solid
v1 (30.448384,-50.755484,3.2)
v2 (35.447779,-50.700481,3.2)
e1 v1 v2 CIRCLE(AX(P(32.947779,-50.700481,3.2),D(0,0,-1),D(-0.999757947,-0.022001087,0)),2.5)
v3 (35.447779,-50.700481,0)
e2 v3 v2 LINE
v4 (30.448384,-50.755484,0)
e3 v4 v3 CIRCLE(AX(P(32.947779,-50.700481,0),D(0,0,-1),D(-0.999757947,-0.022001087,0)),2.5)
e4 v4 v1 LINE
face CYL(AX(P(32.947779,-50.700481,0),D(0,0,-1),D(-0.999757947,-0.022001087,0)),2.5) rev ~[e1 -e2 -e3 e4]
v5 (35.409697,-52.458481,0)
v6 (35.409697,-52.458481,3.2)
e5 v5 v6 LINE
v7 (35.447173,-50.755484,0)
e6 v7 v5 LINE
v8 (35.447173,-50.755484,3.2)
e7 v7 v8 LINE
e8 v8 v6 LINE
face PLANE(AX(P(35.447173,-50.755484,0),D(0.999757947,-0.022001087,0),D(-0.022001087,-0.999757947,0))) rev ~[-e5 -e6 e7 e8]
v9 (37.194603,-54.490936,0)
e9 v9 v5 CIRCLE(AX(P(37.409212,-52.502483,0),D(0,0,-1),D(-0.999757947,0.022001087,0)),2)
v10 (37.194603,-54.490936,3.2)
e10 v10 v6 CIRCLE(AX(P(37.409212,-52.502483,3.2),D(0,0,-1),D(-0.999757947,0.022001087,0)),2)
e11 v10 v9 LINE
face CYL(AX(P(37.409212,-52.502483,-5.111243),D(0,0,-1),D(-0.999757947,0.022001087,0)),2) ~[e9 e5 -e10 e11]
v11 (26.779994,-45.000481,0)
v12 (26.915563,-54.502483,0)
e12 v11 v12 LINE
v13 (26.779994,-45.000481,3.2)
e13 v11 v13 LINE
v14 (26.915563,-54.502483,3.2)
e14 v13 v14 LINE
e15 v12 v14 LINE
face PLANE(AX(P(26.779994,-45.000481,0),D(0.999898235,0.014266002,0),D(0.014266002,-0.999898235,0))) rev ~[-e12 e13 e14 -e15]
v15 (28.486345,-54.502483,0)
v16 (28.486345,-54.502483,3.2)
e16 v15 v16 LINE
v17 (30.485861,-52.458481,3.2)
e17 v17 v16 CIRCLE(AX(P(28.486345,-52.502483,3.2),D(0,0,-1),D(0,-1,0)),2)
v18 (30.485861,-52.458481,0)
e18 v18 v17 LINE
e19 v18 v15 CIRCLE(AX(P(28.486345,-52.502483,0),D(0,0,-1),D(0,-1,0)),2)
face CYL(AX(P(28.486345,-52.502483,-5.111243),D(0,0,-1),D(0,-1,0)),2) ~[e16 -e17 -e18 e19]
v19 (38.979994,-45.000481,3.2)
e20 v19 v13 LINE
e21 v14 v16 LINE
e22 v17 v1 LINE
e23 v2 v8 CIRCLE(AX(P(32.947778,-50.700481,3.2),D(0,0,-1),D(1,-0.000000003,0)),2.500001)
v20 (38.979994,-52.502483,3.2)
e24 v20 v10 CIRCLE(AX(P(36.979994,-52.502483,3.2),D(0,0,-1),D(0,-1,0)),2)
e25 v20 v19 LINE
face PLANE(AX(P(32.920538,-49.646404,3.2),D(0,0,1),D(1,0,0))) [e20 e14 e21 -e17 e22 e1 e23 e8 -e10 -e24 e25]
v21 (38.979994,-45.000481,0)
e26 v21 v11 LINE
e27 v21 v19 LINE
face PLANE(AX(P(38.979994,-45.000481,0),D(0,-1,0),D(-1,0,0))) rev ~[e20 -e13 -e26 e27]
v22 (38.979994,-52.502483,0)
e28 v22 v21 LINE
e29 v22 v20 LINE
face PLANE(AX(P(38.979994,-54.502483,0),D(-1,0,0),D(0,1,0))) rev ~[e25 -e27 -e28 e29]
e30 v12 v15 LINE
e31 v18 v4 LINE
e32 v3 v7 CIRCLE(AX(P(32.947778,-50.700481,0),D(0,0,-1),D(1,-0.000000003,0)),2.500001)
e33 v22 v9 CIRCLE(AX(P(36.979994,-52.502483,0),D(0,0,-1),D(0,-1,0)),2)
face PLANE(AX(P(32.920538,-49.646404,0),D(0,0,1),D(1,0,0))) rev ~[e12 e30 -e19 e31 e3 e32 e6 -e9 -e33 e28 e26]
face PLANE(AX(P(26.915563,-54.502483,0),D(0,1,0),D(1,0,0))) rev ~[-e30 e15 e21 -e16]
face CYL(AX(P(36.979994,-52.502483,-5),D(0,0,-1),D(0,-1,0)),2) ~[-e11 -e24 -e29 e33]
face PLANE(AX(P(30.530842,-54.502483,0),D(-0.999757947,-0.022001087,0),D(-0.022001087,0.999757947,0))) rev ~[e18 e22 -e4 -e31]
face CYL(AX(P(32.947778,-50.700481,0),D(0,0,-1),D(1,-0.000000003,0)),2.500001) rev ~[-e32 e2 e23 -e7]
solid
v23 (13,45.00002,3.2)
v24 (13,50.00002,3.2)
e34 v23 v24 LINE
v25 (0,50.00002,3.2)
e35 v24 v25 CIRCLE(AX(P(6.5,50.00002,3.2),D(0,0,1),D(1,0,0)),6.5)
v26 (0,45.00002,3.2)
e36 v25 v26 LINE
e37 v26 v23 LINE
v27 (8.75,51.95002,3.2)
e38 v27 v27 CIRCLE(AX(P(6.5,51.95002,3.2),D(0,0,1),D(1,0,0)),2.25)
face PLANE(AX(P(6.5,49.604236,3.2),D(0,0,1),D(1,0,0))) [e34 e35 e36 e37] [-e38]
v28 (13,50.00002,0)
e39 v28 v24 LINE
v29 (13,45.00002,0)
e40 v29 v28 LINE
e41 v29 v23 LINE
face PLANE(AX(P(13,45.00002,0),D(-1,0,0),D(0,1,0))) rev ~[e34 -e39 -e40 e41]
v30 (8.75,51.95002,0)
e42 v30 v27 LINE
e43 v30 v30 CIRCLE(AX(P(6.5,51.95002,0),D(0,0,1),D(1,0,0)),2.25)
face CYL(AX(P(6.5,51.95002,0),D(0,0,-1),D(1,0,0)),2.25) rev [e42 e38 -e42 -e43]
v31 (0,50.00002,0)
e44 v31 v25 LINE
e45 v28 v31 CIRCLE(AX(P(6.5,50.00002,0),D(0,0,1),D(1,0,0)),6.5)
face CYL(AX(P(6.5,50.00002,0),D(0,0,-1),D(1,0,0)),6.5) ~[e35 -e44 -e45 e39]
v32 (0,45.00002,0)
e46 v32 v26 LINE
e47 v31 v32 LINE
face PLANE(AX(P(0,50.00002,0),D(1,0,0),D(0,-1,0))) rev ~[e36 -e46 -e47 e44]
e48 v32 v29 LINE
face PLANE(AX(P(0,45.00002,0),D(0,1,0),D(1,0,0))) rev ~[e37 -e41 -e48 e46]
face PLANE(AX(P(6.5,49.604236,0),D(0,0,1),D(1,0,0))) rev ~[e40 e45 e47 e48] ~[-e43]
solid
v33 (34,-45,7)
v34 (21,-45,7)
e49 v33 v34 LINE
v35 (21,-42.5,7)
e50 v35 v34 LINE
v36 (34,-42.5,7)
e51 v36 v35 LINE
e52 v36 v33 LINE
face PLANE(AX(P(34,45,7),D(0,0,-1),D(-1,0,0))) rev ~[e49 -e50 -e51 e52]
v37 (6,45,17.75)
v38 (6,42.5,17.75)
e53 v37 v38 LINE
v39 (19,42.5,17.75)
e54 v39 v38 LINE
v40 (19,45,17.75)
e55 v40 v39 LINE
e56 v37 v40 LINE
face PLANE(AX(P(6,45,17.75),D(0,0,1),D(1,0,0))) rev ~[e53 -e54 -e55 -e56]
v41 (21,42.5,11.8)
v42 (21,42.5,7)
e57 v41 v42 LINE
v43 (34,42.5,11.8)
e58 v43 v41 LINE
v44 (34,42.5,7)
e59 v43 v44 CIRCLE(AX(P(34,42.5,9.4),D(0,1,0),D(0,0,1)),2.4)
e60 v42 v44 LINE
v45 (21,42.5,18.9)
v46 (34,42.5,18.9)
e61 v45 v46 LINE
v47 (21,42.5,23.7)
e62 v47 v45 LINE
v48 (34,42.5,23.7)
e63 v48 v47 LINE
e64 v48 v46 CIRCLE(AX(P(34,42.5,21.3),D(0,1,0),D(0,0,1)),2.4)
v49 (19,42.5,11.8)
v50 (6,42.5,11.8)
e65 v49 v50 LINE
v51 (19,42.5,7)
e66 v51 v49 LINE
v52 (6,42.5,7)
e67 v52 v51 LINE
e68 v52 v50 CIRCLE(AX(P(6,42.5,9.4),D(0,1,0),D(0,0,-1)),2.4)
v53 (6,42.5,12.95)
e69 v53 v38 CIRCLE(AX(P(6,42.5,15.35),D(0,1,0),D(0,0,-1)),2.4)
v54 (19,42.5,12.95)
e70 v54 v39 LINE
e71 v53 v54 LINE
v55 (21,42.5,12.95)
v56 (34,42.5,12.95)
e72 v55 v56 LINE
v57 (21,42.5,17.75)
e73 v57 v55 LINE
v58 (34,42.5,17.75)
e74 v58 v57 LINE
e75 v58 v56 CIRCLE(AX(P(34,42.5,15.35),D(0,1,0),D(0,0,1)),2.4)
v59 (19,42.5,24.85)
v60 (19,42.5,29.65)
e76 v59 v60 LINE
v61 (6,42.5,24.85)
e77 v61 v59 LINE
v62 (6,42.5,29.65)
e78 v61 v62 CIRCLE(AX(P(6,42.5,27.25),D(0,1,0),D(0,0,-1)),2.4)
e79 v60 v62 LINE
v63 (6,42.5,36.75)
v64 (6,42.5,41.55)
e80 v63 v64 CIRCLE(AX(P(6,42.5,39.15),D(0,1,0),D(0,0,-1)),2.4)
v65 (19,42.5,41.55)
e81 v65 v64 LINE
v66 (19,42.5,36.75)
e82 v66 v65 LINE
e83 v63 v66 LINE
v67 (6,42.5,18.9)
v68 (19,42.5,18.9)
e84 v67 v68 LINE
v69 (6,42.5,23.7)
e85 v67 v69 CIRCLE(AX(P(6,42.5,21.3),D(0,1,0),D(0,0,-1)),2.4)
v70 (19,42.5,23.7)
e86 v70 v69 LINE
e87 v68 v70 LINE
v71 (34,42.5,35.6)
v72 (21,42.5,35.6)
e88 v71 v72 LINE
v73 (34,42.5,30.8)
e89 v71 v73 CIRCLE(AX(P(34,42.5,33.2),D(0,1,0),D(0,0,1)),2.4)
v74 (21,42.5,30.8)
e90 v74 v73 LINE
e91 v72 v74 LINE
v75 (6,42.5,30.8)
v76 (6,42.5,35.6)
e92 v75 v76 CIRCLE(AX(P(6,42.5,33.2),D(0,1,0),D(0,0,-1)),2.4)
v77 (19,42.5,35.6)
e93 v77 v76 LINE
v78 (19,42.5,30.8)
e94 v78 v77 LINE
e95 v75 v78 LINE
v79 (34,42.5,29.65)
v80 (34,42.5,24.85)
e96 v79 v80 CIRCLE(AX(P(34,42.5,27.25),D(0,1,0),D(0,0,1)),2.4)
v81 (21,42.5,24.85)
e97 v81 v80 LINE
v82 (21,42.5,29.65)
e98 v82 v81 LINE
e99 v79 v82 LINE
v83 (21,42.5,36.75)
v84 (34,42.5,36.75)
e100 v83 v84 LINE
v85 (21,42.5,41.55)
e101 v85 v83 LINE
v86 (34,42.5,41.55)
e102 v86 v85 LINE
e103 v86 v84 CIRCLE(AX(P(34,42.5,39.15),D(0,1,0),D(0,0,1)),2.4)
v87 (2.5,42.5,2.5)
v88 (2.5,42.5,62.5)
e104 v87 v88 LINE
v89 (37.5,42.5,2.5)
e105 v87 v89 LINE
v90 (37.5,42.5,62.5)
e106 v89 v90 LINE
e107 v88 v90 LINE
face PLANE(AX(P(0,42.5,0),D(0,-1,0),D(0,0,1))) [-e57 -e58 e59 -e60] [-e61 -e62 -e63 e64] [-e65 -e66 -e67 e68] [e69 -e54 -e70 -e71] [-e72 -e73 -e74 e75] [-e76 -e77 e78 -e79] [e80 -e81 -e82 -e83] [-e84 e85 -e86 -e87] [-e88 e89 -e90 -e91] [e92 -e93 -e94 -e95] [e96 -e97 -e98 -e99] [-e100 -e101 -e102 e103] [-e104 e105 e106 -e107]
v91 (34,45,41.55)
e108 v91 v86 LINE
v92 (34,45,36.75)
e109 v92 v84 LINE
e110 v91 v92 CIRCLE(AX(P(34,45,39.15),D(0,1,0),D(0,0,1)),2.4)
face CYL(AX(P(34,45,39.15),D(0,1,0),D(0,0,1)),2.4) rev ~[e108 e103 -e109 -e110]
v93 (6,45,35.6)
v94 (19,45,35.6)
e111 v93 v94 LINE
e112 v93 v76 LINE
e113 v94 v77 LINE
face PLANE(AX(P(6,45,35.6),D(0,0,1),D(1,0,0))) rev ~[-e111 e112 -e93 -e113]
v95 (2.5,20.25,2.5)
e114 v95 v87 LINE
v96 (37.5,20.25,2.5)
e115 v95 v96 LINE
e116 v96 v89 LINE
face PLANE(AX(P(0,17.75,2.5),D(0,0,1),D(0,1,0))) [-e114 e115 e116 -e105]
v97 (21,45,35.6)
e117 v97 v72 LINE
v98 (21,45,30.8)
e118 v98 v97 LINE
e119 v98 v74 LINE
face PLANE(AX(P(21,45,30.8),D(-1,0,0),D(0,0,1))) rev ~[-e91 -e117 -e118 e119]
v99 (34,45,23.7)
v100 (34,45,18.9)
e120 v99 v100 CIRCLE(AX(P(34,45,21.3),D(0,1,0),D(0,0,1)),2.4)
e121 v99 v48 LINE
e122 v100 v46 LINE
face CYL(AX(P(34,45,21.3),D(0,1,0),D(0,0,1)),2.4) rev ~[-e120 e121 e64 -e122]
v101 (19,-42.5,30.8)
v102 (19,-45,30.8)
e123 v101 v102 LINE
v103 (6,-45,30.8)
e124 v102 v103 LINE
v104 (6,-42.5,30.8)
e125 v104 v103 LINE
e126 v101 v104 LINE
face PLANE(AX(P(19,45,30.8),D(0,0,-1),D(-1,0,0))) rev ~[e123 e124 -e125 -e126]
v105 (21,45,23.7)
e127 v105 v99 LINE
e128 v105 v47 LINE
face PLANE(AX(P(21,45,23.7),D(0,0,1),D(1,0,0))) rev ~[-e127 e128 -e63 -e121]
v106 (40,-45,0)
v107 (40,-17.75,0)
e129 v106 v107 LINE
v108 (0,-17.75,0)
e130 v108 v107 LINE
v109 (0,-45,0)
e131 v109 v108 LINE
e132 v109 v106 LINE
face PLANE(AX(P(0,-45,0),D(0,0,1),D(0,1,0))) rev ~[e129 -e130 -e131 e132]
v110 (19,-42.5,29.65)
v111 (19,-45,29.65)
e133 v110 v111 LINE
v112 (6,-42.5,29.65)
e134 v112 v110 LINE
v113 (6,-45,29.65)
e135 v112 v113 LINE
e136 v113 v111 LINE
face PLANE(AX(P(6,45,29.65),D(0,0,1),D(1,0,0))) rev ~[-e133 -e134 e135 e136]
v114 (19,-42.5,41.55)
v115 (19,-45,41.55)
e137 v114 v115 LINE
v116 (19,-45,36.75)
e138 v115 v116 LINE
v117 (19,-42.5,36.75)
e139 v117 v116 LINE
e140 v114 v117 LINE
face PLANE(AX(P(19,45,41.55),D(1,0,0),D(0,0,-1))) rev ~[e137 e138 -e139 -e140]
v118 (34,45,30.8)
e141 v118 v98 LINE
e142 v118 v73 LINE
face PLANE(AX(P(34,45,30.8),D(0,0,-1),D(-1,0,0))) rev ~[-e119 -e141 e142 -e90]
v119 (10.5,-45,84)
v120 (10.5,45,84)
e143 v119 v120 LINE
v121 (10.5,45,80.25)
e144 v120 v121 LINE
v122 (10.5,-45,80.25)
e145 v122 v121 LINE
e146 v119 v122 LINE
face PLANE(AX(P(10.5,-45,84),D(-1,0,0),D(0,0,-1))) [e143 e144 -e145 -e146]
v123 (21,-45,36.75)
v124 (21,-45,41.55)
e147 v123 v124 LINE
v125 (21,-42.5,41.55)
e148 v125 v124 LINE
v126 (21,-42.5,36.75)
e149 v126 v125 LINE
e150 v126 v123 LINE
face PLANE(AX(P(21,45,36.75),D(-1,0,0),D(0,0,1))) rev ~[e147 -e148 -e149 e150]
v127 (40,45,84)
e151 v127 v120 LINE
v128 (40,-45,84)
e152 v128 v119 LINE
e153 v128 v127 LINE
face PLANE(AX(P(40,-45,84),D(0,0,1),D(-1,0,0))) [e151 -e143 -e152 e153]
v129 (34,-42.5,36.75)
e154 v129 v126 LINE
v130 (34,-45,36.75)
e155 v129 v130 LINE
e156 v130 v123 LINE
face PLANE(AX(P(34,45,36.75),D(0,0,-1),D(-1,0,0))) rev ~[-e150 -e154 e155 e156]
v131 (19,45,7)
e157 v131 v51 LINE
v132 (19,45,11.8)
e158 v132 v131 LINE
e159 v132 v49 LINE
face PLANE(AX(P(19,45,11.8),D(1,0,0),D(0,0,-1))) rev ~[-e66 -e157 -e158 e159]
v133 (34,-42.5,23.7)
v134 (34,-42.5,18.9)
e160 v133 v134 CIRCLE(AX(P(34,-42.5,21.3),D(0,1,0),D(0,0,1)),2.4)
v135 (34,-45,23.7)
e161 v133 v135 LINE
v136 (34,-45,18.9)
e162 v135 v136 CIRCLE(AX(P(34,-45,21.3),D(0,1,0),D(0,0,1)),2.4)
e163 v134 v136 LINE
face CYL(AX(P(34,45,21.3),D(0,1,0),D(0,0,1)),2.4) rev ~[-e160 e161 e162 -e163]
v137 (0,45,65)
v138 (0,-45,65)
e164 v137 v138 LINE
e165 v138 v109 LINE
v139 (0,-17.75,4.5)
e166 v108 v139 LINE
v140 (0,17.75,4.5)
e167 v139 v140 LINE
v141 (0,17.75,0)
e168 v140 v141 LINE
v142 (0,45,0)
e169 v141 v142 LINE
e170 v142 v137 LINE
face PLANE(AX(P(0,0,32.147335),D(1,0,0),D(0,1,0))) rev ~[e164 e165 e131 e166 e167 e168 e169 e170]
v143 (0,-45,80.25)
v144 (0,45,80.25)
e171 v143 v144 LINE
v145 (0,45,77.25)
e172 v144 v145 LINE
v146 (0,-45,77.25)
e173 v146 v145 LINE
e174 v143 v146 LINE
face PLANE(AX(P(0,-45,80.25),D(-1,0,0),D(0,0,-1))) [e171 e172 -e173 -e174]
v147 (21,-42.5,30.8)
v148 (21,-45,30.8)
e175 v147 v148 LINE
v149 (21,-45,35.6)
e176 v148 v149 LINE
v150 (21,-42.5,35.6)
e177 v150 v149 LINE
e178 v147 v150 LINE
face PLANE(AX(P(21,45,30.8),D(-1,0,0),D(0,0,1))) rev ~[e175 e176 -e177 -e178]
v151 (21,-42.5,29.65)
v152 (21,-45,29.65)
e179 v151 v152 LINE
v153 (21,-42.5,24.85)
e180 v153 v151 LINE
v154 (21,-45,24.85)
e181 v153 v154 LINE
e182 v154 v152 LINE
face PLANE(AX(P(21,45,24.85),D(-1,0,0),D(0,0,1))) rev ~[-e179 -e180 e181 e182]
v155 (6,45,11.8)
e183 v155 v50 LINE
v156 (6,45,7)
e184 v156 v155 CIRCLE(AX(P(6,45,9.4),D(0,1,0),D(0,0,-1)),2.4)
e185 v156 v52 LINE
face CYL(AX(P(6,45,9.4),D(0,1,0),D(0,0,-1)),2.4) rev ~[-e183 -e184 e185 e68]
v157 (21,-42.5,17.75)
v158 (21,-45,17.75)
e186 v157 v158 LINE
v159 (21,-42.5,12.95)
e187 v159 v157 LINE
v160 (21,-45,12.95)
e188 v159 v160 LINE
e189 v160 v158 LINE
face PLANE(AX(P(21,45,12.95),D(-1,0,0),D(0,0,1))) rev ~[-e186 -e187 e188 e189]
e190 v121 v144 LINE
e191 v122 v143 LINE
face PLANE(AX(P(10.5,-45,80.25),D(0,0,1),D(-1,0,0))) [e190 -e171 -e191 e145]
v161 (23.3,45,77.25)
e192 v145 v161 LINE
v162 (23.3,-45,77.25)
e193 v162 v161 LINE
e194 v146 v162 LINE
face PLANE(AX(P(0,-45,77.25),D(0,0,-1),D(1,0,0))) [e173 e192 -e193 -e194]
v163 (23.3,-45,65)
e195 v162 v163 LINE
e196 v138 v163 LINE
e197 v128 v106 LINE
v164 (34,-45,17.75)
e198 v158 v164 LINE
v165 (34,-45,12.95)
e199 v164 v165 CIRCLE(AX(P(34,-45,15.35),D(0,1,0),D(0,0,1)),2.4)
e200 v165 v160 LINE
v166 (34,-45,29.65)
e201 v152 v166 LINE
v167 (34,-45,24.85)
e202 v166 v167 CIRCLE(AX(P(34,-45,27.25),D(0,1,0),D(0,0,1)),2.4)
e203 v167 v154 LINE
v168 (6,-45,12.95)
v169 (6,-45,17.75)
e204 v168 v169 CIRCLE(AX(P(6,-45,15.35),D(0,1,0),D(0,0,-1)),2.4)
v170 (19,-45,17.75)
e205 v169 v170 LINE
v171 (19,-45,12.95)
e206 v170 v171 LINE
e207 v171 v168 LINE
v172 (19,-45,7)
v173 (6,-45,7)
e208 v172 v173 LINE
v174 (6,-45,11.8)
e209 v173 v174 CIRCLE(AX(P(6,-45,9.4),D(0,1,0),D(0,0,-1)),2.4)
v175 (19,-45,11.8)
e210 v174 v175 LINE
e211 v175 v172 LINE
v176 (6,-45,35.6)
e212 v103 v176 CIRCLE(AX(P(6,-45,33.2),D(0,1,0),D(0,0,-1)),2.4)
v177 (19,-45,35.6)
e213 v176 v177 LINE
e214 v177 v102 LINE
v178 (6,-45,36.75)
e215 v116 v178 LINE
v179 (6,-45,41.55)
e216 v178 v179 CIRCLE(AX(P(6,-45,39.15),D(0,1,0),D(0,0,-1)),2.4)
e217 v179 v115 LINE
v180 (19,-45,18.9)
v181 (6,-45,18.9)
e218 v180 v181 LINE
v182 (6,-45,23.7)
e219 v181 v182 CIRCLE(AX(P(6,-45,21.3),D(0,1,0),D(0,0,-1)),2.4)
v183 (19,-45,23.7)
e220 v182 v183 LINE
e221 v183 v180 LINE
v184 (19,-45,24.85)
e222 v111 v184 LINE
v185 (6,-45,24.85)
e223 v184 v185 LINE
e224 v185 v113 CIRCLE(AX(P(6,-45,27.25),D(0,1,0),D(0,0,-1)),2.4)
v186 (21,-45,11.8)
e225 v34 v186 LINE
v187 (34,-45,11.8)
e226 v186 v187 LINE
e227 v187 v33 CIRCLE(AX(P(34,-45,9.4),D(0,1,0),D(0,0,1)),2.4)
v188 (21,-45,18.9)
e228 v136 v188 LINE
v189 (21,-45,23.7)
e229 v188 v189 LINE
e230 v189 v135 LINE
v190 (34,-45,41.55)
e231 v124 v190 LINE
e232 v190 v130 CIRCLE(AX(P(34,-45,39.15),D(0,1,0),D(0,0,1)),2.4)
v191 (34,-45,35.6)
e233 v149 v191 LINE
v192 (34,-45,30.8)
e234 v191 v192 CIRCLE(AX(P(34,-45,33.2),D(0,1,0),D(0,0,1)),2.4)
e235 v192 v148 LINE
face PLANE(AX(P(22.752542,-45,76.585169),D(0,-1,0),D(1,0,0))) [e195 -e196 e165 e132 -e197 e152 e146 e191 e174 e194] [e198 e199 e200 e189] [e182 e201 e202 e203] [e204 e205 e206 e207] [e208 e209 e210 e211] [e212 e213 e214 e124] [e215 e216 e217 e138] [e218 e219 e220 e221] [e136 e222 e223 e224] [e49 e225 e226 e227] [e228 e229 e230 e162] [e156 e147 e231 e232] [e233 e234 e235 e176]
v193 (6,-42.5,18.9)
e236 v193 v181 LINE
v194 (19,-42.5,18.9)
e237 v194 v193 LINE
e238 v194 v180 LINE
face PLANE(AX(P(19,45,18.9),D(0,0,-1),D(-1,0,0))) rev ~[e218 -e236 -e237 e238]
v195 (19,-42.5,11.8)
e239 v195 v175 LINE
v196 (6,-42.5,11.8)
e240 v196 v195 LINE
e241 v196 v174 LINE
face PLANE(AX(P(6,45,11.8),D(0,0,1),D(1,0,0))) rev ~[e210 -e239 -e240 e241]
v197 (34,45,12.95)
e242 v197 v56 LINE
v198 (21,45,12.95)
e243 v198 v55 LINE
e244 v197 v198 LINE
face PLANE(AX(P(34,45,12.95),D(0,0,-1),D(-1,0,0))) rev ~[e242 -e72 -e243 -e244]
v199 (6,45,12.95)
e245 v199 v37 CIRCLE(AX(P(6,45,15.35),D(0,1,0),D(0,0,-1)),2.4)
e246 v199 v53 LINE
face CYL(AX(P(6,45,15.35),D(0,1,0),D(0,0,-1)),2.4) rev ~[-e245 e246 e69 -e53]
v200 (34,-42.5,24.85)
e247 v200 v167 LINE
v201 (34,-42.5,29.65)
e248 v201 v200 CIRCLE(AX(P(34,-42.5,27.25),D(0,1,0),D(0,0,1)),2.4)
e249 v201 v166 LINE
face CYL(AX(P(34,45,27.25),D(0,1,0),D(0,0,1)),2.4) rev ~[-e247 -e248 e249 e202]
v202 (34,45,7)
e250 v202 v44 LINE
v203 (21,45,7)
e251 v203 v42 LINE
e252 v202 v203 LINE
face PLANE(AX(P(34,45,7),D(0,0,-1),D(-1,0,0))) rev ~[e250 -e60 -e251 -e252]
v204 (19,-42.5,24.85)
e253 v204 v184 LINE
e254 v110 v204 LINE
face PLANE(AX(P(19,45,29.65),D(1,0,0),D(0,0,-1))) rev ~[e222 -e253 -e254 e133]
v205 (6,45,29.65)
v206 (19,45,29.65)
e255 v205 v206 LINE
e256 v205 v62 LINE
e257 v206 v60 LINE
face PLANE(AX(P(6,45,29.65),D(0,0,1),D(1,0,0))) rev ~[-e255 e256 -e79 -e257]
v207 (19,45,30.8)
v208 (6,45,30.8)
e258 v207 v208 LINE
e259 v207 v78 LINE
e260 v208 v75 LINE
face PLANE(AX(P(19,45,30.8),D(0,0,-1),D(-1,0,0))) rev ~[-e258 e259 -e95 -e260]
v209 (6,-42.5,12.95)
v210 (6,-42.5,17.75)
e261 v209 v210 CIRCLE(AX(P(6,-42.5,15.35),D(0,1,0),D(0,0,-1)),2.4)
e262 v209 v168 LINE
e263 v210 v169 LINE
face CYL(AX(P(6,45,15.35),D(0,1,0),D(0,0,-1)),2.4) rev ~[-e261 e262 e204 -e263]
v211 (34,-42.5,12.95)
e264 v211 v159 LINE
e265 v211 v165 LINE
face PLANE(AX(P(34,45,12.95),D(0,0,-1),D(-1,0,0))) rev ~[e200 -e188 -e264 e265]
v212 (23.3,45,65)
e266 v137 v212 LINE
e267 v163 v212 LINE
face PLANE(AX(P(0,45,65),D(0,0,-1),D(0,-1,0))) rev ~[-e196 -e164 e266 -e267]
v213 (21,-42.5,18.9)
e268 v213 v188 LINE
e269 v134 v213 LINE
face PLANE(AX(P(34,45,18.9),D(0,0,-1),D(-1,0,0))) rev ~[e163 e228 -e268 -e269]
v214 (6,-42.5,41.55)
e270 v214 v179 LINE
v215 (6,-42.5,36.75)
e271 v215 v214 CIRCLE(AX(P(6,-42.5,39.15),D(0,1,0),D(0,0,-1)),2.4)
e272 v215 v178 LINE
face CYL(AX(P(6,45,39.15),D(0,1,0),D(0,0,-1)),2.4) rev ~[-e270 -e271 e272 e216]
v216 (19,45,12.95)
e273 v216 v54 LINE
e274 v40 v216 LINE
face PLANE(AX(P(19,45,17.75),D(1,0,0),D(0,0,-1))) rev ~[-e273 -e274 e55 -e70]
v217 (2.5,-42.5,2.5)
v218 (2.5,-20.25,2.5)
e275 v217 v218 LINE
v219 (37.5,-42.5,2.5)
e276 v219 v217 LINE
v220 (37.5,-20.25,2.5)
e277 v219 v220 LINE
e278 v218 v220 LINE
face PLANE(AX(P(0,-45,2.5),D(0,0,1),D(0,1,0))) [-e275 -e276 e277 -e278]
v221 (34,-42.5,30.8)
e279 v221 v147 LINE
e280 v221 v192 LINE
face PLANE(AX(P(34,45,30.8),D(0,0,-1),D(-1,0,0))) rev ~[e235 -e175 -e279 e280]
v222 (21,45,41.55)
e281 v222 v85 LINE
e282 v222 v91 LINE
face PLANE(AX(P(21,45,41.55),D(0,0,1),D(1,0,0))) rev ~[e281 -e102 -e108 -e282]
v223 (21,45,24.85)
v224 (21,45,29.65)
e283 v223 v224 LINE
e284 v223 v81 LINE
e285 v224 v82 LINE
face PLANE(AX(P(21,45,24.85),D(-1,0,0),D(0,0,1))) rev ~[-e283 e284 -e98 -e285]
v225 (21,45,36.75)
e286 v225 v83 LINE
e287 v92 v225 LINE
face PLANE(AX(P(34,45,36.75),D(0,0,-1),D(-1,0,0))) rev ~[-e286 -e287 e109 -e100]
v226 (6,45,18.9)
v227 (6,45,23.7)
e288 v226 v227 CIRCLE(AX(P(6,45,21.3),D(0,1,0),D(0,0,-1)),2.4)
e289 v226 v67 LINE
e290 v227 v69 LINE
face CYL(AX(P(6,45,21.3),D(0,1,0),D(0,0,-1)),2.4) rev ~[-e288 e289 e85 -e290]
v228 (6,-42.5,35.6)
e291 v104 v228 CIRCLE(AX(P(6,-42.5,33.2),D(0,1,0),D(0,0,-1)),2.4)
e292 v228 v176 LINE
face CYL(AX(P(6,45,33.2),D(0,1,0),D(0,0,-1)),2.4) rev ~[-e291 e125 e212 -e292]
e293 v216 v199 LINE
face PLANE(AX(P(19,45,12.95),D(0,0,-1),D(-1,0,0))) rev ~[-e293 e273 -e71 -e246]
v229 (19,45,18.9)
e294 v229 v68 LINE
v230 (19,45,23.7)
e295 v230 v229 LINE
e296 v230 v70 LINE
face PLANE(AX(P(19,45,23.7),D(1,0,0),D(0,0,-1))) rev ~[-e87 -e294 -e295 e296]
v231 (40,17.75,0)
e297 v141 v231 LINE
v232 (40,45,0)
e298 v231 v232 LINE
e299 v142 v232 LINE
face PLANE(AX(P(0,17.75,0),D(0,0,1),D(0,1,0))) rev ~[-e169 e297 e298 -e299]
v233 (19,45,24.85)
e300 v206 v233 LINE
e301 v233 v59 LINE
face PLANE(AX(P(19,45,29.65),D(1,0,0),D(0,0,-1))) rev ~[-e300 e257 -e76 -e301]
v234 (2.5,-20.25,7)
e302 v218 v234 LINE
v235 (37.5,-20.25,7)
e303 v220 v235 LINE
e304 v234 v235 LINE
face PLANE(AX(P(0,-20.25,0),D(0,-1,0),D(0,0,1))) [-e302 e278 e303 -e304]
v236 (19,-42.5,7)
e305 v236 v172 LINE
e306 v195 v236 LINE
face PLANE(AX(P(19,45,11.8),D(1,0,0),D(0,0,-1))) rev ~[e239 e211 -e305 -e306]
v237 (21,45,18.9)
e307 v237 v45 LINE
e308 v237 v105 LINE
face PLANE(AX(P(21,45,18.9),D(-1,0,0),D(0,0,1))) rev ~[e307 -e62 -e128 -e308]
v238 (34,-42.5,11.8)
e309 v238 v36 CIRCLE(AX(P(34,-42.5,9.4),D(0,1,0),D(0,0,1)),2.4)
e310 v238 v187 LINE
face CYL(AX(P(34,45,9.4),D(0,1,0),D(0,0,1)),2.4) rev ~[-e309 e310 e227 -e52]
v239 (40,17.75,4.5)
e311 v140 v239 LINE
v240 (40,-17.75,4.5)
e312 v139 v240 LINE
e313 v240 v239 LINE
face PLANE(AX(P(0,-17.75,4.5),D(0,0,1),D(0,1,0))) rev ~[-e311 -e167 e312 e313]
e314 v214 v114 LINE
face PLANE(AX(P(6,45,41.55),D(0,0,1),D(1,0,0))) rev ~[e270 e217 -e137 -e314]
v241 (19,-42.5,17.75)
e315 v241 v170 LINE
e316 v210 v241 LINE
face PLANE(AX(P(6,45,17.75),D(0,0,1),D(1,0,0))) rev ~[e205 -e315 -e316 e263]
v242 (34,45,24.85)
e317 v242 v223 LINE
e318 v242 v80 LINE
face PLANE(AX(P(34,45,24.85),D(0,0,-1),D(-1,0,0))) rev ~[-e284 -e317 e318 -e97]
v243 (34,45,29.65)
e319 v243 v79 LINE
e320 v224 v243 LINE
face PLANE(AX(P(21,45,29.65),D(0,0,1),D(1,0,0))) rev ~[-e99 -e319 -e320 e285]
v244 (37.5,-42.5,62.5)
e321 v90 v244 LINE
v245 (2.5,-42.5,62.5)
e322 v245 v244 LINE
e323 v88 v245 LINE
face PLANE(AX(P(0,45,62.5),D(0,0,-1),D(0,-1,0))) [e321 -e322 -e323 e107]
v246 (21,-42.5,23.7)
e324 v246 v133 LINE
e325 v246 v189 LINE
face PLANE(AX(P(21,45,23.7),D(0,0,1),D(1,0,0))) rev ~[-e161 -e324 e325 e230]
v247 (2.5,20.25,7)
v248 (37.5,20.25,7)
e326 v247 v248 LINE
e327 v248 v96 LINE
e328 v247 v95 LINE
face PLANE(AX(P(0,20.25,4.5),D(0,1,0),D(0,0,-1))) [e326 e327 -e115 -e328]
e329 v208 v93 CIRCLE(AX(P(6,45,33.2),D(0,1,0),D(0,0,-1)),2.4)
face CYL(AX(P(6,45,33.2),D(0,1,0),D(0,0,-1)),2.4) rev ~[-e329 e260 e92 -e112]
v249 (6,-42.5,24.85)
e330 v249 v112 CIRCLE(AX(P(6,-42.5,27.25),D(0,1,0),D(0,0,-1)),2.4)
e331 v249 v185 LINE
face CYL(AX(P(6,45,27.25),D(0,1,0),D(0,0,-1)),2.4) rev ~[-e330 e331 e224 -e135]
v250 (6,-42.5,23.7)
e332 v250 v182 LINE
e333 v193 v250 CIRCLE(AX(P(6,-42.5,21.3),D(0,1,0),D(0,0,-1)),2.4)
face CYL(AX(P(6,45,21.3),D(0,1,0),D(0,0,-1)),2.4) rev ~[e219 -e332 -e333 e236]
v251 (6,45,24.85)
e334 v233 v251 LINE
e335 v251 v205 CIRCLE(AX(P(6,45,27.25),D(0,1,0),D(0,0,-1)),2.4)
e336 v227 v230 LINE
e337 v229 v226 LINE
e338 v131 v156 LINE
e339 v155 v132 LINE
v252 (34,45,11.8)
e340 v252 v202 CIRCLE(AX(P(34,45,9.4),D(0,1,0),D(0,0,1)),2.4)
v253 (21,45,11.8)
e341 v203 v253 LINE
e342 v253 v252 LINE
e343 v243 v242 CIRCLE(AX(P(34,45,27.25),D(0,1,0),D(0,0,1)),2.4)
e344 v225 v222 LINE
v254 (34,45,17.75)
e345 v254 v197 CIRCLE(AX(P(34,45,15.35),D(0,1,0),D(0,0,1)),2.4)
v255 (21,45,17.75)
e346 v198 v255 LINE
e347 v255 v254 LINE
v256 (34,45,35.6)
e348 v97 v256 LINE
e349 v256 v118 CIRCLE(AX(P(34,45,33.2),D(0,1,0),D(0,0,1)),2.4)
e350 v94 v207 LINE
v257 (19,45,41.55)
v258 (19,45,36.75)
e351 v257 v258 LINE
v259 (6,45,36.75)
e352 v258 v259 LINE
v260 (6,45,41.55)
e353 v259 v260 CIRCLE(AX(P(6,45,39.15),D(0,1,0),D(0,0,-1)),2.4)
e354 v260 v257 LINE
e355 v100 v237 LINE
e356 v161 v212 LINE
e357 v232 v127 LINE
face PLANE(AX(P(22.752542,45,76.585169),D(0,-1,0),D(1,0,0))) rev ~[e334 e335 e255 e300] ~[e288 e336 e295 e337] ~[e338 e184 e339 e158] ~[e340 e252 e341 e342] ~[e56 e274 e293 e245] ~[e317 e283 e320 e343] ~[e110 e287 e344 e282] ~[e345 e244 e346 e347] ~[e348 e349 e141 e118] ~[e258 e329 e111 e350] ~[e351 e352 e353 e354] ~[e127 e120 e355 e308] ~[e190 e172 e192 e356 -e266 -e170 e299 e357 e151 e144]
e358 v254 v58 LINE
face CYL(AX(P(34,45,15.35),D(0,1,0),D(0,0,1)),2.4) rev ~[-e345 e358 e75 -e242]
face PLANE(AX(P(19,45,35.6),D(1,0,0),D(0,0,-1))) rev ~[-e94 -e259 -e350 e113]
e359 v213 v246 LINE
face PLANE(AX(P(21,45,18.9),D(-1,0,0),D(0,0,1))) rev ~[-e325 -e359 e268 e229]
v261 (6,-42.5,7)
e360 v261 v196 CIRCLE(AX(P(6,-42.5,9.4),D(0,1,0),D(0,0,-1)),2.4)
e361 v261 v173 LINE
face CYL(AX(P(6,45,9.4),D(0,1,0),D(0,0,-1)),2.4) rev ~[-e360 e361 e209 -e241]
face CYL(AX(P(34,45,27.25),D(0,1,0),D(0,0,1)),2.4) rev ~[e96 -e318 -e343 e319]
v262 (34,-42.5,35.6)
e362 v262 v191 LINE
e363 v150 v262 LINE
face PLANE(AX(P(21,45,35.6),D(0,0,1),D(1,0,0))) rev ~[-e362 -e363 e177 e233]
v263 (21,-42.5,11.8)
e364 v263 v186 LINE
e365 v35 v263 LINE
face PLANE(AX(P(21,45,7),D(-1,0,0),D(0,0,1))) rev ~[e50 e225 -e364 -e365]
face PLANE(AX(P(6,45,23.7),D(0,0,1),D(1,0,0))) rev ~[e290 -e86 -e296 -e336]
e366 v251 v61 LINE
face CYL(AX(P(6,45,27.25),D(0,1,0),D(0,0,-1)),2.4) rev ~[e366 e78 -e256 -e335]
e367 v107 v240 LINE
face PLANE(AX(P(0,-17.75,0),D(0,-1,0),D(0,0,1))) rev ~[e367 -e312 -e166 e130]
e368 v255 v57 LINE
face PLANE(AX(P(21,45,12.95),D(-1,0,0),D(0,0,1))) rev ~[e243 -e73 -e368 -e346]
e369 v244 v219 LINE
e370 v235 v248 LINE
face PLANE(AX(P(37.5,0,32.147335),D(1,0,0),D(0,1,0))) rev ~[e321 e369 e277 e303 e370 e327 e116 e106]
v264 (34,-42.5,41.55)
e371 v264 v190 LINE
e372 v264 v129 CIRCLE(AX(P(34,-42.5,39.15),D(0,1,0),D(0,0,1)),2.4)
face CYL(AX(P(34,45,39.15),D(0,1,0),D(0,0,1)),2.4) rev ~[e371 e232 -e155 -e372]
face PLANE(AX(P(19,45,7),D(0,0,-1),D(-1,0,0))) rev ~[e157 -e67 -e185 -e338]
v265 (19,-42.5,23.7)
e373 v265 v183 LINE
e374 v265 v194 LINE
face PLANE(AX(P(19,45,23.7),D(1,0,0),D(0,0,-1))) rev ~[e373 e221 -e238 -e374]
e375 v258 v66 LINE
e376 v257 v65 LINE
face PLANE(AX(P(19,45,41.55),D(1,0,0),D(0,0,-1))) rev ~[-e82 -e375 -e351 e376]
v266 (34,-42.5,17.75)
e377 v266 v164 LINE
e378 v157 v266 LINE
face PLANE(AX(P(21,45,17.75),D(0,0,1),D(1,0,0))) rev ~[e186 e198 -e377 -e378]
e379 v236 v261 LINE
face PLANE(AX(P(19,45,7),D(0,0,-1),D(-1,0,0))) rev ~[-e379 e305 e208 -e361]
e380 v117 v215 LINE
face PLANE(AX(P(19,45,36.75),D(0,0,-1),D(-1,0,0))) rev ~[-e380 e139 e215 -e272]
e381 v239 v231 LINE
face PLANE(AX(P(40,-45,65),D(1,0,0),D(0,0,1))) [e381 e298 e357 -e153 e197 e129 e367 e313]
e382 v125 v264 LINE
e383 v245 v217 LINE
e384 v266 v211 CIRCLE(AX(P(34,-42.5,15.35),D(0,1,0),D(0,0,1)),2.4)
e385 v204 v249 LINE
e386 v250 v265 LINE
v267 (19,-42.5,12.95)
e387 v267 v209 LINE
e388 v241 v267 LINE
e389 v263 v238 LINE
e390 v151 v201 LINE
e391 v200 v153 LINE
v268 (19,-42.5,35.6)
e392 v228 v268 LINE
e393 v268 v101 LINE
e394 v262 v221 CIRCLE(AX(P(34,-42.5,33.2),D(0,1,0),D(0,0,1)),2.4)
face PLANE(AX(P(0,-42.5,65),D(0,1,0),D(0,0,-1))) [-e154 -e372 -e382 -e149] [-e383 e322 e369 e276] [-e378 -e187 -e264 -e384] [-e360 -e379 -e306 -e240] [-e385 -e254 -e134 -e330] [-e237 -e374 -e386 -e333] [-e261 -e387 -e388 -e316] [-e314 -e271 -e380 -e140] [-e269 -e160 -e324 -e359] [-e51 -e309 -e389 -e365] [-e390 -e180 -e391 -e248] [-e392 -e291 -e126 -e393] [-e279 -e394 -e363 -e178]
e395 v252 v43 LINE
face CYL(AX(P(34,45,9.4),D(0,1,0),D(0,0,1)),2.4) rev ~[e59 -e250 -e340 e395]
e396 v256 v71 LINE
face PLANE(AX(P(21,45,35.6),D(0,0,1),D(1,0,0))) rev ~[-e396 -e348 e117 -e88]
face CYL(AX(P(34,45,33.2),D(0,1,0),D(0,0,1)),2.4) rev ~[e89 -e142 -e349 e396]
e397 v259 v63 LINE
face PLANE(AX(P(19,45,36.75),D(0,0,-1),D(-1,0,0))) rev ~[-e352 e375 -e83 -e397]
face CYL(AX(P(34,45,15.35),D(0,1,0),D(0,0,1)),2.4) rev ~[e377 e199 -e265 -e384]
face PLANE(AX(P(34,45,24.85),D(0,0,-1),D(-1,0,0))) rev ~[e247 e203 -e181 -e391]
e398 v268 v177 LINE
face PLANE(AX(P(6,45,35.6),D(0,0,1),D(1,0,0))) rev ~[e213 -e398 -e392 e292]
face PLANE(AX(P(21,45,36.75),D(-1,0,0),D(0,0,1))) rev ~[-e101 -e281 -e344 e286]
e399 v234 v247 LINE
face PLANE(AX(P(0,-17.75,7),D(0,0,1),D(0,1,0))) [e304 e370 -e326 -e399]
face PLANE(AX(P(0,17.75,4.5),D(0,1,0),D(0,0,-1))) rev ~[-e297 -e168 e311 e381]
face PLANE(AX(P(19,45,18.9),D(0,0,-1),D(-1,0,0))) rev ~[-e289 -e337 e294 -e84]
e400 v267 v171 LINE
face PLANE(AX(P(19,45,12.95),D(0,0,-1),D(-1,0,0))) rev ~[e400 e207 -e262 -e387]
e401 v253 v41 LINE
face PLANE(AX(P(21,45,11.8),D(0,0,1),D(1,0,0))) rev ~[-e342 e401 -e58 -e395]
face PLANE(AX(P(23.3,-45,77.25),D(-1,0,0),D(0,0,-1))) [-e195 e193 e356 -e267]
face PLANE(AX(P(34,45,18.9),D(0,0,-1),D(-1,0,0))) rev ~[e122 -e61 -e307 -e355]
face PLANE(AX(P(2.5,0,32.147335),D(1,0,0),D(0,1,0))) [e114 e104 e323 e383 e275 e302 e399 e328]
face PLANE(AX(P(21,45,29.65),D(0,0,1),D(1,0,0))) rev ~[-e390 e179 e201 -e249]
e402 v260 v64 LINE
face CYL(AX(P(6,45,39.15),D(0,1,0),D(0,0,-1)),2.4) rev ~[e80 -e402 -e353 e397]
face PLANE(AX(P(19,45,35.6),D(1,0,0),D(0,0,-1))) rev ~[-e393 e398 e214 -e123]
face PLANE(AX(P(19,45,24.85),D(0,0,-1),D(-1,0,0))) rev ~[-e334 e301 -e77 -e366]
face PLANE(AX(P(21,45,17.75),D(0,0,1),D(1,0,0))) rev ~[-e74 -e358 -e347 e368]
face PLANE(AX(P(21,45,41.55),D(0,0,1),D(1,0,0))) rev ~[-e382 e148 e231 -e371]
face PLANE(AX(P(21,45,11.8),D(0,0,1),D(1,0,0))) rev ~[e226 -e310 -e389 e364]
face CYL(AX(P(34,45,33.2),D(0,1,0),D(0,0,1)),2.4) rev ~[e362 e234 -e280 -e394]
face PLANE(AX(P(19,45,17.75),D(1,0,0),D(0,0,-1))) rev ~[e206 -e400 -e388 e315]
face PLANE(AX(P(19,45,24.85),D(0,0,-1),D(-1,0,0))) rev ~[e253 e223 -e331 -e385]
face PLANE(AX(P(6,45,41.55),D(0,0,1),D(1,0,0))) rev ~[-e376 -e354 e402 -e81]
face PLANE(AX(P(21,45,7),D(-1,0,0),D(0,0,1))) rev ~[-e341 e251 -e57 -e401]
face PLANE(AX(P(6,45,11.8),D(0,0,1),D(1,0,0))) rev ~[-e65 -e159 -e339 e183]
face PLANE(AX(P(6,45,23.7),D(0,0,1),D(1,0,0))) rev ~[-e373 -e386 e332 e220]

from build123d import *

# Parameters (mm, degrees)
F1_DEPTH    = 40
F3_T        = -2.5
F4_DEPTH    = 90.001
F6_DEPTH    = 90
F7_R        = 2.25
F8_DEPTH    = 3.2
F9_T1_DEPTH = 13.4224852585
F9_T3_DEPTH = 13.2


# Not quite as in the source:
# - a fillet or chamfer that OpenCascade refuses, or shapes differently, is made with other operations: its cross-section is extruded or revolved along the edge and cut away or added


with BuildPart() as f1:
    # F0 (on Right) → F1 (new body)
    with BuildSketch(Plane.YZ):
        Polygon((-45, 0), (-17.75, 0), (-17.75, 4.5), (17.75, 4.5), (17.75, 0), (45, 0), (45, 65), (-45, 65), align=None)
    extrude(amount=F1_DEPTH)

    # F3 (hollow: no face is removed)
    offset(amount=F3_T, kind=Kind.INTERSECTION, mode=Mode.SUBTRACT)

    # F2 (on face) → F4 (cut, through all)
    with BuildSketch(Plane(origin=(0, 45, 0), x_dir=(-1, 0, 0), z_dir=(0, 1, 0))):
        with BuildLine():
            Line((-21, 36.75), (-21, 41.55))
            Line((-21, 41.55), (-34, 41.55))
            ThreePointArc((-34, 41.55), (-36.4, 39.15), (-34, 36.75))
            Line((-34, 36.75), (-21, 36.75))
        make_face()
        with BuildLine():
            Line((-19, 41.55), (-19, 36.75))
            Line((-19, 36.75), (-6, 36.75))
            ThreePointArc((-6, 36.75), (-3.6, 39.15), (-6, 41.55))
            Line((-6, 41.55), (-19, 41.55))
        make_face()
        with BuildLine():
            Line((-19, 35.6), (-19, 30.8))
            Line((-19, 30.8), (-6, 30.8))
            ThreePointArc((-6, 30.8), (-3.6, 33.2), (-6, 35.6))
            Line((-6, 35.6), (-19, 35.6))
        make_face()
        with BuildLine():
            Line((-21, 30.8), (-21, 35.6))
            Line((-21, 35.6), (-34, 35.6))
            ThreePointArc((-34, 35.6), (-36.4, 33.2), (-34, 30.8))
            Line((-34, 30.8), (-21, 30.8))
        make_face()
        with BuildLine():
            Line((-21, 24.85), (-21, 29.65))
            Line((-21, 29.65), (-34, 29.65))
            ThreePointArc((-34, 29.65), (-36.4, 27.25), (-34, 24.85))
            Line((-34, 24.85), (-21, 24.85))
        make_face()
        with BuildLine():
            Line((-19, 29.65), (-19, 24.85))
            Line((-19, 24.85), (-6, 24.85))
            ThreePointArc((-6, 24.85), (-3.6, 27.25), (-6, 29.65))
            Line((-6, 29.65), (-19, 29.65))
        make_face()
        with BuildLine():
            Line((-21, 18.9), (-21, 23.7))
            Line((-21, 23.7), (-34, 23.7))
            ThreePointArc((-34, 23.7), (-36.4, 21.3), (-34, 18.9))
            Line((-34, 18.9), (-21, 18.9))
        make_face()
        with BuildLine():
            Line((-19, 23.7), (-19, 18.9))
            Line((-19, 18.9), (-6, 18.9))
            ThreePointArc((-6, 18.9), (-3.6, 21.3), (-6, 23.7))
            Line((-6, 23.7), (-19, 23.7))
        make_face()
        with BuildLine():
            Line((-21, 12.95), (-21, 17.75))
            Line((-21, 17.75), (-34, 17.75))
            ThreePointArc((-34, 17.75), (-36.4, 15.35), (-34, 12.95))
            Line((-34, 12.95), (-21, 12.95))
        make_face()
        with BuildLine():
            Line((-19, 17.75), (-19, 12.95))
            Line((-19, 12.95), (-6, 12.95))
            ThreePointArc((-6, 12.95), (-3.6, 15.35), (-6, 17.75))
            Line((-6, 17.75), (-19, 17.75))
        make_face()
        with BuildLine():
            Line((-34, 7), (-21, 7))
            Line((-21, 7), (-21, 11.8))
            Line((-21, 11.8), (-34, 11.8))
            ThreePointArc((-34, 11.8), (-36.4, 9.4), (-34, 7))
        make_face()
        with BuildLine():
            Line((-19, 11.8), (-19, 7))
            Line((-19, 7), (-6, 7))
            ThreePointArc((-6, 7), (-3.6, 9.4), (-6, 11.8))
            Line((-6, 11.8), (-19, 11.8))
        make_face()
    extrude(amount=-F4_DEPTH, mode=Mode.SUBTRACT)

    # F5 (on face) → F6 (join)
    with BuildSketch(Plane.XZ.offset(45)):
        Polygon((23.3, 65), (40, 65), (40, 84), (10.5, 84), (10.5, 80.25), (0, 80.25), (0, 77.25), (23.3, 77.25), align=None)
    extrude(amount=-F6_DEPTH)


with BuildPart() as f8:
    # F7 (on Top) → F8 (new body)
    with BuildSketch(Plane.XY):
        with BuildLine():
            Line((0, 50.0000204146), (0, 45.0000204146))
            Line((0, 45.0000204146), (13, 45.0000204146))
            Line((13, 45.0000204146), (13, 50.0000204146))
            ThreePointArc((13, 50.0000204146), (6.5, 56.5000204146), (0, 50.0000204146))
        make_face()
        with Locations((6.5, 51.9500204146)):
            Circle(F7_R, mode=Mode.SUBTRACT)
    extrude(amount=F8_DEPTH)


with BuildPart() as f8b:
    # F7 (on Top) → F8, piece 2 (new body)
    with BuildSketch(Plane.XY):
        with BuildLine():
            Line((38.9799938861, -54.5024834573), (38.9799938861, -45.0004808827))
            Line((38.9799938861, -45.0004808827), (26.7799938861, -45.0004808827))
            Line((26.7799938861, -45.0004808827), (26.9155632704, -54.5024834573))
            Line((26.9155632704, -54.5024834573), (30.5308417415, -54.5024834573))
            Line((30.5308417415, -54.5024834573), (30.4483837113, -50.755483601))
            ThreePointArc((30.4483837113, -50.755483601), (32.9202755548, -48.2006321706), (35.4477785783, -50.7004808827))
            ThreePointArc((35.4477785783, -50.7004808827), (35.4476272904, -50.7279839062), (35.4471734452, -50.755483601))
            Line((35.4471734452, -50.755483601), (35.364715415, -54.5024834573))
            Line((35.364715415, -54.5024834573), (38.9799938861, -54.5024834573))
        make_face()
    extrude(amount=F8_DEPTH)

    # F9: fillet of radius 2 on 3 edges, made by hand

    # F9_s2 → F9_t1 (cut)
    with BuildSketch(Plane.XY.offset(-5.1112426292)):
        with BuildLine():
            ThreePointArc((28.4863446898, -54.5024834573), (29.9160307304, -53.9010533789), (30.4858605834, -52.4584812827))
            Line((30.4858605834, -52.4584812827), (30.5308417415, -54.5024834573))
            Line((30.5308417415, -54.5024834573), (28.4863446898, -54.5024834573))
        make_face()
        with BuildLine():
            ThreePointArc((35.4096965732, -52.4584812827), (35.9795264262, -53.9010533789), (37.4092124667, -54.5024834573))
            Line((37.4092124667, -54.5024834573), (35.364715415, -54.5024834573))
            Line((35.364715415, -54.5024834573), (35.4096965732, -52.4584812827))
        make_face()
    extrude(amount=F9_T1_DEPTH, mode=Mode.SUBTRACT)

    # F9_s4 → F9_t3 (cut)
    with BuildSketch(Plane.XY.offset(-5)):
        with BuildLine():
            ThreePointArc((36.9799938861, -54.5024834573), (38.3942074485, -53.9166970197), (38.9799938861, -52.5024834573))
            Line((38.9799938861, -52.5024834573), (38.9799938861, -54.5024834573))
            Line((38.9799938861, -54.5024834573), (36.9799938861, -54.5024834573))
        make_face()
    extrude(amount=F9_T3_DEPTH, mode=Mode.SUBTRACT)


solid = Compound([f1.part, f8.part, f8b.part])
